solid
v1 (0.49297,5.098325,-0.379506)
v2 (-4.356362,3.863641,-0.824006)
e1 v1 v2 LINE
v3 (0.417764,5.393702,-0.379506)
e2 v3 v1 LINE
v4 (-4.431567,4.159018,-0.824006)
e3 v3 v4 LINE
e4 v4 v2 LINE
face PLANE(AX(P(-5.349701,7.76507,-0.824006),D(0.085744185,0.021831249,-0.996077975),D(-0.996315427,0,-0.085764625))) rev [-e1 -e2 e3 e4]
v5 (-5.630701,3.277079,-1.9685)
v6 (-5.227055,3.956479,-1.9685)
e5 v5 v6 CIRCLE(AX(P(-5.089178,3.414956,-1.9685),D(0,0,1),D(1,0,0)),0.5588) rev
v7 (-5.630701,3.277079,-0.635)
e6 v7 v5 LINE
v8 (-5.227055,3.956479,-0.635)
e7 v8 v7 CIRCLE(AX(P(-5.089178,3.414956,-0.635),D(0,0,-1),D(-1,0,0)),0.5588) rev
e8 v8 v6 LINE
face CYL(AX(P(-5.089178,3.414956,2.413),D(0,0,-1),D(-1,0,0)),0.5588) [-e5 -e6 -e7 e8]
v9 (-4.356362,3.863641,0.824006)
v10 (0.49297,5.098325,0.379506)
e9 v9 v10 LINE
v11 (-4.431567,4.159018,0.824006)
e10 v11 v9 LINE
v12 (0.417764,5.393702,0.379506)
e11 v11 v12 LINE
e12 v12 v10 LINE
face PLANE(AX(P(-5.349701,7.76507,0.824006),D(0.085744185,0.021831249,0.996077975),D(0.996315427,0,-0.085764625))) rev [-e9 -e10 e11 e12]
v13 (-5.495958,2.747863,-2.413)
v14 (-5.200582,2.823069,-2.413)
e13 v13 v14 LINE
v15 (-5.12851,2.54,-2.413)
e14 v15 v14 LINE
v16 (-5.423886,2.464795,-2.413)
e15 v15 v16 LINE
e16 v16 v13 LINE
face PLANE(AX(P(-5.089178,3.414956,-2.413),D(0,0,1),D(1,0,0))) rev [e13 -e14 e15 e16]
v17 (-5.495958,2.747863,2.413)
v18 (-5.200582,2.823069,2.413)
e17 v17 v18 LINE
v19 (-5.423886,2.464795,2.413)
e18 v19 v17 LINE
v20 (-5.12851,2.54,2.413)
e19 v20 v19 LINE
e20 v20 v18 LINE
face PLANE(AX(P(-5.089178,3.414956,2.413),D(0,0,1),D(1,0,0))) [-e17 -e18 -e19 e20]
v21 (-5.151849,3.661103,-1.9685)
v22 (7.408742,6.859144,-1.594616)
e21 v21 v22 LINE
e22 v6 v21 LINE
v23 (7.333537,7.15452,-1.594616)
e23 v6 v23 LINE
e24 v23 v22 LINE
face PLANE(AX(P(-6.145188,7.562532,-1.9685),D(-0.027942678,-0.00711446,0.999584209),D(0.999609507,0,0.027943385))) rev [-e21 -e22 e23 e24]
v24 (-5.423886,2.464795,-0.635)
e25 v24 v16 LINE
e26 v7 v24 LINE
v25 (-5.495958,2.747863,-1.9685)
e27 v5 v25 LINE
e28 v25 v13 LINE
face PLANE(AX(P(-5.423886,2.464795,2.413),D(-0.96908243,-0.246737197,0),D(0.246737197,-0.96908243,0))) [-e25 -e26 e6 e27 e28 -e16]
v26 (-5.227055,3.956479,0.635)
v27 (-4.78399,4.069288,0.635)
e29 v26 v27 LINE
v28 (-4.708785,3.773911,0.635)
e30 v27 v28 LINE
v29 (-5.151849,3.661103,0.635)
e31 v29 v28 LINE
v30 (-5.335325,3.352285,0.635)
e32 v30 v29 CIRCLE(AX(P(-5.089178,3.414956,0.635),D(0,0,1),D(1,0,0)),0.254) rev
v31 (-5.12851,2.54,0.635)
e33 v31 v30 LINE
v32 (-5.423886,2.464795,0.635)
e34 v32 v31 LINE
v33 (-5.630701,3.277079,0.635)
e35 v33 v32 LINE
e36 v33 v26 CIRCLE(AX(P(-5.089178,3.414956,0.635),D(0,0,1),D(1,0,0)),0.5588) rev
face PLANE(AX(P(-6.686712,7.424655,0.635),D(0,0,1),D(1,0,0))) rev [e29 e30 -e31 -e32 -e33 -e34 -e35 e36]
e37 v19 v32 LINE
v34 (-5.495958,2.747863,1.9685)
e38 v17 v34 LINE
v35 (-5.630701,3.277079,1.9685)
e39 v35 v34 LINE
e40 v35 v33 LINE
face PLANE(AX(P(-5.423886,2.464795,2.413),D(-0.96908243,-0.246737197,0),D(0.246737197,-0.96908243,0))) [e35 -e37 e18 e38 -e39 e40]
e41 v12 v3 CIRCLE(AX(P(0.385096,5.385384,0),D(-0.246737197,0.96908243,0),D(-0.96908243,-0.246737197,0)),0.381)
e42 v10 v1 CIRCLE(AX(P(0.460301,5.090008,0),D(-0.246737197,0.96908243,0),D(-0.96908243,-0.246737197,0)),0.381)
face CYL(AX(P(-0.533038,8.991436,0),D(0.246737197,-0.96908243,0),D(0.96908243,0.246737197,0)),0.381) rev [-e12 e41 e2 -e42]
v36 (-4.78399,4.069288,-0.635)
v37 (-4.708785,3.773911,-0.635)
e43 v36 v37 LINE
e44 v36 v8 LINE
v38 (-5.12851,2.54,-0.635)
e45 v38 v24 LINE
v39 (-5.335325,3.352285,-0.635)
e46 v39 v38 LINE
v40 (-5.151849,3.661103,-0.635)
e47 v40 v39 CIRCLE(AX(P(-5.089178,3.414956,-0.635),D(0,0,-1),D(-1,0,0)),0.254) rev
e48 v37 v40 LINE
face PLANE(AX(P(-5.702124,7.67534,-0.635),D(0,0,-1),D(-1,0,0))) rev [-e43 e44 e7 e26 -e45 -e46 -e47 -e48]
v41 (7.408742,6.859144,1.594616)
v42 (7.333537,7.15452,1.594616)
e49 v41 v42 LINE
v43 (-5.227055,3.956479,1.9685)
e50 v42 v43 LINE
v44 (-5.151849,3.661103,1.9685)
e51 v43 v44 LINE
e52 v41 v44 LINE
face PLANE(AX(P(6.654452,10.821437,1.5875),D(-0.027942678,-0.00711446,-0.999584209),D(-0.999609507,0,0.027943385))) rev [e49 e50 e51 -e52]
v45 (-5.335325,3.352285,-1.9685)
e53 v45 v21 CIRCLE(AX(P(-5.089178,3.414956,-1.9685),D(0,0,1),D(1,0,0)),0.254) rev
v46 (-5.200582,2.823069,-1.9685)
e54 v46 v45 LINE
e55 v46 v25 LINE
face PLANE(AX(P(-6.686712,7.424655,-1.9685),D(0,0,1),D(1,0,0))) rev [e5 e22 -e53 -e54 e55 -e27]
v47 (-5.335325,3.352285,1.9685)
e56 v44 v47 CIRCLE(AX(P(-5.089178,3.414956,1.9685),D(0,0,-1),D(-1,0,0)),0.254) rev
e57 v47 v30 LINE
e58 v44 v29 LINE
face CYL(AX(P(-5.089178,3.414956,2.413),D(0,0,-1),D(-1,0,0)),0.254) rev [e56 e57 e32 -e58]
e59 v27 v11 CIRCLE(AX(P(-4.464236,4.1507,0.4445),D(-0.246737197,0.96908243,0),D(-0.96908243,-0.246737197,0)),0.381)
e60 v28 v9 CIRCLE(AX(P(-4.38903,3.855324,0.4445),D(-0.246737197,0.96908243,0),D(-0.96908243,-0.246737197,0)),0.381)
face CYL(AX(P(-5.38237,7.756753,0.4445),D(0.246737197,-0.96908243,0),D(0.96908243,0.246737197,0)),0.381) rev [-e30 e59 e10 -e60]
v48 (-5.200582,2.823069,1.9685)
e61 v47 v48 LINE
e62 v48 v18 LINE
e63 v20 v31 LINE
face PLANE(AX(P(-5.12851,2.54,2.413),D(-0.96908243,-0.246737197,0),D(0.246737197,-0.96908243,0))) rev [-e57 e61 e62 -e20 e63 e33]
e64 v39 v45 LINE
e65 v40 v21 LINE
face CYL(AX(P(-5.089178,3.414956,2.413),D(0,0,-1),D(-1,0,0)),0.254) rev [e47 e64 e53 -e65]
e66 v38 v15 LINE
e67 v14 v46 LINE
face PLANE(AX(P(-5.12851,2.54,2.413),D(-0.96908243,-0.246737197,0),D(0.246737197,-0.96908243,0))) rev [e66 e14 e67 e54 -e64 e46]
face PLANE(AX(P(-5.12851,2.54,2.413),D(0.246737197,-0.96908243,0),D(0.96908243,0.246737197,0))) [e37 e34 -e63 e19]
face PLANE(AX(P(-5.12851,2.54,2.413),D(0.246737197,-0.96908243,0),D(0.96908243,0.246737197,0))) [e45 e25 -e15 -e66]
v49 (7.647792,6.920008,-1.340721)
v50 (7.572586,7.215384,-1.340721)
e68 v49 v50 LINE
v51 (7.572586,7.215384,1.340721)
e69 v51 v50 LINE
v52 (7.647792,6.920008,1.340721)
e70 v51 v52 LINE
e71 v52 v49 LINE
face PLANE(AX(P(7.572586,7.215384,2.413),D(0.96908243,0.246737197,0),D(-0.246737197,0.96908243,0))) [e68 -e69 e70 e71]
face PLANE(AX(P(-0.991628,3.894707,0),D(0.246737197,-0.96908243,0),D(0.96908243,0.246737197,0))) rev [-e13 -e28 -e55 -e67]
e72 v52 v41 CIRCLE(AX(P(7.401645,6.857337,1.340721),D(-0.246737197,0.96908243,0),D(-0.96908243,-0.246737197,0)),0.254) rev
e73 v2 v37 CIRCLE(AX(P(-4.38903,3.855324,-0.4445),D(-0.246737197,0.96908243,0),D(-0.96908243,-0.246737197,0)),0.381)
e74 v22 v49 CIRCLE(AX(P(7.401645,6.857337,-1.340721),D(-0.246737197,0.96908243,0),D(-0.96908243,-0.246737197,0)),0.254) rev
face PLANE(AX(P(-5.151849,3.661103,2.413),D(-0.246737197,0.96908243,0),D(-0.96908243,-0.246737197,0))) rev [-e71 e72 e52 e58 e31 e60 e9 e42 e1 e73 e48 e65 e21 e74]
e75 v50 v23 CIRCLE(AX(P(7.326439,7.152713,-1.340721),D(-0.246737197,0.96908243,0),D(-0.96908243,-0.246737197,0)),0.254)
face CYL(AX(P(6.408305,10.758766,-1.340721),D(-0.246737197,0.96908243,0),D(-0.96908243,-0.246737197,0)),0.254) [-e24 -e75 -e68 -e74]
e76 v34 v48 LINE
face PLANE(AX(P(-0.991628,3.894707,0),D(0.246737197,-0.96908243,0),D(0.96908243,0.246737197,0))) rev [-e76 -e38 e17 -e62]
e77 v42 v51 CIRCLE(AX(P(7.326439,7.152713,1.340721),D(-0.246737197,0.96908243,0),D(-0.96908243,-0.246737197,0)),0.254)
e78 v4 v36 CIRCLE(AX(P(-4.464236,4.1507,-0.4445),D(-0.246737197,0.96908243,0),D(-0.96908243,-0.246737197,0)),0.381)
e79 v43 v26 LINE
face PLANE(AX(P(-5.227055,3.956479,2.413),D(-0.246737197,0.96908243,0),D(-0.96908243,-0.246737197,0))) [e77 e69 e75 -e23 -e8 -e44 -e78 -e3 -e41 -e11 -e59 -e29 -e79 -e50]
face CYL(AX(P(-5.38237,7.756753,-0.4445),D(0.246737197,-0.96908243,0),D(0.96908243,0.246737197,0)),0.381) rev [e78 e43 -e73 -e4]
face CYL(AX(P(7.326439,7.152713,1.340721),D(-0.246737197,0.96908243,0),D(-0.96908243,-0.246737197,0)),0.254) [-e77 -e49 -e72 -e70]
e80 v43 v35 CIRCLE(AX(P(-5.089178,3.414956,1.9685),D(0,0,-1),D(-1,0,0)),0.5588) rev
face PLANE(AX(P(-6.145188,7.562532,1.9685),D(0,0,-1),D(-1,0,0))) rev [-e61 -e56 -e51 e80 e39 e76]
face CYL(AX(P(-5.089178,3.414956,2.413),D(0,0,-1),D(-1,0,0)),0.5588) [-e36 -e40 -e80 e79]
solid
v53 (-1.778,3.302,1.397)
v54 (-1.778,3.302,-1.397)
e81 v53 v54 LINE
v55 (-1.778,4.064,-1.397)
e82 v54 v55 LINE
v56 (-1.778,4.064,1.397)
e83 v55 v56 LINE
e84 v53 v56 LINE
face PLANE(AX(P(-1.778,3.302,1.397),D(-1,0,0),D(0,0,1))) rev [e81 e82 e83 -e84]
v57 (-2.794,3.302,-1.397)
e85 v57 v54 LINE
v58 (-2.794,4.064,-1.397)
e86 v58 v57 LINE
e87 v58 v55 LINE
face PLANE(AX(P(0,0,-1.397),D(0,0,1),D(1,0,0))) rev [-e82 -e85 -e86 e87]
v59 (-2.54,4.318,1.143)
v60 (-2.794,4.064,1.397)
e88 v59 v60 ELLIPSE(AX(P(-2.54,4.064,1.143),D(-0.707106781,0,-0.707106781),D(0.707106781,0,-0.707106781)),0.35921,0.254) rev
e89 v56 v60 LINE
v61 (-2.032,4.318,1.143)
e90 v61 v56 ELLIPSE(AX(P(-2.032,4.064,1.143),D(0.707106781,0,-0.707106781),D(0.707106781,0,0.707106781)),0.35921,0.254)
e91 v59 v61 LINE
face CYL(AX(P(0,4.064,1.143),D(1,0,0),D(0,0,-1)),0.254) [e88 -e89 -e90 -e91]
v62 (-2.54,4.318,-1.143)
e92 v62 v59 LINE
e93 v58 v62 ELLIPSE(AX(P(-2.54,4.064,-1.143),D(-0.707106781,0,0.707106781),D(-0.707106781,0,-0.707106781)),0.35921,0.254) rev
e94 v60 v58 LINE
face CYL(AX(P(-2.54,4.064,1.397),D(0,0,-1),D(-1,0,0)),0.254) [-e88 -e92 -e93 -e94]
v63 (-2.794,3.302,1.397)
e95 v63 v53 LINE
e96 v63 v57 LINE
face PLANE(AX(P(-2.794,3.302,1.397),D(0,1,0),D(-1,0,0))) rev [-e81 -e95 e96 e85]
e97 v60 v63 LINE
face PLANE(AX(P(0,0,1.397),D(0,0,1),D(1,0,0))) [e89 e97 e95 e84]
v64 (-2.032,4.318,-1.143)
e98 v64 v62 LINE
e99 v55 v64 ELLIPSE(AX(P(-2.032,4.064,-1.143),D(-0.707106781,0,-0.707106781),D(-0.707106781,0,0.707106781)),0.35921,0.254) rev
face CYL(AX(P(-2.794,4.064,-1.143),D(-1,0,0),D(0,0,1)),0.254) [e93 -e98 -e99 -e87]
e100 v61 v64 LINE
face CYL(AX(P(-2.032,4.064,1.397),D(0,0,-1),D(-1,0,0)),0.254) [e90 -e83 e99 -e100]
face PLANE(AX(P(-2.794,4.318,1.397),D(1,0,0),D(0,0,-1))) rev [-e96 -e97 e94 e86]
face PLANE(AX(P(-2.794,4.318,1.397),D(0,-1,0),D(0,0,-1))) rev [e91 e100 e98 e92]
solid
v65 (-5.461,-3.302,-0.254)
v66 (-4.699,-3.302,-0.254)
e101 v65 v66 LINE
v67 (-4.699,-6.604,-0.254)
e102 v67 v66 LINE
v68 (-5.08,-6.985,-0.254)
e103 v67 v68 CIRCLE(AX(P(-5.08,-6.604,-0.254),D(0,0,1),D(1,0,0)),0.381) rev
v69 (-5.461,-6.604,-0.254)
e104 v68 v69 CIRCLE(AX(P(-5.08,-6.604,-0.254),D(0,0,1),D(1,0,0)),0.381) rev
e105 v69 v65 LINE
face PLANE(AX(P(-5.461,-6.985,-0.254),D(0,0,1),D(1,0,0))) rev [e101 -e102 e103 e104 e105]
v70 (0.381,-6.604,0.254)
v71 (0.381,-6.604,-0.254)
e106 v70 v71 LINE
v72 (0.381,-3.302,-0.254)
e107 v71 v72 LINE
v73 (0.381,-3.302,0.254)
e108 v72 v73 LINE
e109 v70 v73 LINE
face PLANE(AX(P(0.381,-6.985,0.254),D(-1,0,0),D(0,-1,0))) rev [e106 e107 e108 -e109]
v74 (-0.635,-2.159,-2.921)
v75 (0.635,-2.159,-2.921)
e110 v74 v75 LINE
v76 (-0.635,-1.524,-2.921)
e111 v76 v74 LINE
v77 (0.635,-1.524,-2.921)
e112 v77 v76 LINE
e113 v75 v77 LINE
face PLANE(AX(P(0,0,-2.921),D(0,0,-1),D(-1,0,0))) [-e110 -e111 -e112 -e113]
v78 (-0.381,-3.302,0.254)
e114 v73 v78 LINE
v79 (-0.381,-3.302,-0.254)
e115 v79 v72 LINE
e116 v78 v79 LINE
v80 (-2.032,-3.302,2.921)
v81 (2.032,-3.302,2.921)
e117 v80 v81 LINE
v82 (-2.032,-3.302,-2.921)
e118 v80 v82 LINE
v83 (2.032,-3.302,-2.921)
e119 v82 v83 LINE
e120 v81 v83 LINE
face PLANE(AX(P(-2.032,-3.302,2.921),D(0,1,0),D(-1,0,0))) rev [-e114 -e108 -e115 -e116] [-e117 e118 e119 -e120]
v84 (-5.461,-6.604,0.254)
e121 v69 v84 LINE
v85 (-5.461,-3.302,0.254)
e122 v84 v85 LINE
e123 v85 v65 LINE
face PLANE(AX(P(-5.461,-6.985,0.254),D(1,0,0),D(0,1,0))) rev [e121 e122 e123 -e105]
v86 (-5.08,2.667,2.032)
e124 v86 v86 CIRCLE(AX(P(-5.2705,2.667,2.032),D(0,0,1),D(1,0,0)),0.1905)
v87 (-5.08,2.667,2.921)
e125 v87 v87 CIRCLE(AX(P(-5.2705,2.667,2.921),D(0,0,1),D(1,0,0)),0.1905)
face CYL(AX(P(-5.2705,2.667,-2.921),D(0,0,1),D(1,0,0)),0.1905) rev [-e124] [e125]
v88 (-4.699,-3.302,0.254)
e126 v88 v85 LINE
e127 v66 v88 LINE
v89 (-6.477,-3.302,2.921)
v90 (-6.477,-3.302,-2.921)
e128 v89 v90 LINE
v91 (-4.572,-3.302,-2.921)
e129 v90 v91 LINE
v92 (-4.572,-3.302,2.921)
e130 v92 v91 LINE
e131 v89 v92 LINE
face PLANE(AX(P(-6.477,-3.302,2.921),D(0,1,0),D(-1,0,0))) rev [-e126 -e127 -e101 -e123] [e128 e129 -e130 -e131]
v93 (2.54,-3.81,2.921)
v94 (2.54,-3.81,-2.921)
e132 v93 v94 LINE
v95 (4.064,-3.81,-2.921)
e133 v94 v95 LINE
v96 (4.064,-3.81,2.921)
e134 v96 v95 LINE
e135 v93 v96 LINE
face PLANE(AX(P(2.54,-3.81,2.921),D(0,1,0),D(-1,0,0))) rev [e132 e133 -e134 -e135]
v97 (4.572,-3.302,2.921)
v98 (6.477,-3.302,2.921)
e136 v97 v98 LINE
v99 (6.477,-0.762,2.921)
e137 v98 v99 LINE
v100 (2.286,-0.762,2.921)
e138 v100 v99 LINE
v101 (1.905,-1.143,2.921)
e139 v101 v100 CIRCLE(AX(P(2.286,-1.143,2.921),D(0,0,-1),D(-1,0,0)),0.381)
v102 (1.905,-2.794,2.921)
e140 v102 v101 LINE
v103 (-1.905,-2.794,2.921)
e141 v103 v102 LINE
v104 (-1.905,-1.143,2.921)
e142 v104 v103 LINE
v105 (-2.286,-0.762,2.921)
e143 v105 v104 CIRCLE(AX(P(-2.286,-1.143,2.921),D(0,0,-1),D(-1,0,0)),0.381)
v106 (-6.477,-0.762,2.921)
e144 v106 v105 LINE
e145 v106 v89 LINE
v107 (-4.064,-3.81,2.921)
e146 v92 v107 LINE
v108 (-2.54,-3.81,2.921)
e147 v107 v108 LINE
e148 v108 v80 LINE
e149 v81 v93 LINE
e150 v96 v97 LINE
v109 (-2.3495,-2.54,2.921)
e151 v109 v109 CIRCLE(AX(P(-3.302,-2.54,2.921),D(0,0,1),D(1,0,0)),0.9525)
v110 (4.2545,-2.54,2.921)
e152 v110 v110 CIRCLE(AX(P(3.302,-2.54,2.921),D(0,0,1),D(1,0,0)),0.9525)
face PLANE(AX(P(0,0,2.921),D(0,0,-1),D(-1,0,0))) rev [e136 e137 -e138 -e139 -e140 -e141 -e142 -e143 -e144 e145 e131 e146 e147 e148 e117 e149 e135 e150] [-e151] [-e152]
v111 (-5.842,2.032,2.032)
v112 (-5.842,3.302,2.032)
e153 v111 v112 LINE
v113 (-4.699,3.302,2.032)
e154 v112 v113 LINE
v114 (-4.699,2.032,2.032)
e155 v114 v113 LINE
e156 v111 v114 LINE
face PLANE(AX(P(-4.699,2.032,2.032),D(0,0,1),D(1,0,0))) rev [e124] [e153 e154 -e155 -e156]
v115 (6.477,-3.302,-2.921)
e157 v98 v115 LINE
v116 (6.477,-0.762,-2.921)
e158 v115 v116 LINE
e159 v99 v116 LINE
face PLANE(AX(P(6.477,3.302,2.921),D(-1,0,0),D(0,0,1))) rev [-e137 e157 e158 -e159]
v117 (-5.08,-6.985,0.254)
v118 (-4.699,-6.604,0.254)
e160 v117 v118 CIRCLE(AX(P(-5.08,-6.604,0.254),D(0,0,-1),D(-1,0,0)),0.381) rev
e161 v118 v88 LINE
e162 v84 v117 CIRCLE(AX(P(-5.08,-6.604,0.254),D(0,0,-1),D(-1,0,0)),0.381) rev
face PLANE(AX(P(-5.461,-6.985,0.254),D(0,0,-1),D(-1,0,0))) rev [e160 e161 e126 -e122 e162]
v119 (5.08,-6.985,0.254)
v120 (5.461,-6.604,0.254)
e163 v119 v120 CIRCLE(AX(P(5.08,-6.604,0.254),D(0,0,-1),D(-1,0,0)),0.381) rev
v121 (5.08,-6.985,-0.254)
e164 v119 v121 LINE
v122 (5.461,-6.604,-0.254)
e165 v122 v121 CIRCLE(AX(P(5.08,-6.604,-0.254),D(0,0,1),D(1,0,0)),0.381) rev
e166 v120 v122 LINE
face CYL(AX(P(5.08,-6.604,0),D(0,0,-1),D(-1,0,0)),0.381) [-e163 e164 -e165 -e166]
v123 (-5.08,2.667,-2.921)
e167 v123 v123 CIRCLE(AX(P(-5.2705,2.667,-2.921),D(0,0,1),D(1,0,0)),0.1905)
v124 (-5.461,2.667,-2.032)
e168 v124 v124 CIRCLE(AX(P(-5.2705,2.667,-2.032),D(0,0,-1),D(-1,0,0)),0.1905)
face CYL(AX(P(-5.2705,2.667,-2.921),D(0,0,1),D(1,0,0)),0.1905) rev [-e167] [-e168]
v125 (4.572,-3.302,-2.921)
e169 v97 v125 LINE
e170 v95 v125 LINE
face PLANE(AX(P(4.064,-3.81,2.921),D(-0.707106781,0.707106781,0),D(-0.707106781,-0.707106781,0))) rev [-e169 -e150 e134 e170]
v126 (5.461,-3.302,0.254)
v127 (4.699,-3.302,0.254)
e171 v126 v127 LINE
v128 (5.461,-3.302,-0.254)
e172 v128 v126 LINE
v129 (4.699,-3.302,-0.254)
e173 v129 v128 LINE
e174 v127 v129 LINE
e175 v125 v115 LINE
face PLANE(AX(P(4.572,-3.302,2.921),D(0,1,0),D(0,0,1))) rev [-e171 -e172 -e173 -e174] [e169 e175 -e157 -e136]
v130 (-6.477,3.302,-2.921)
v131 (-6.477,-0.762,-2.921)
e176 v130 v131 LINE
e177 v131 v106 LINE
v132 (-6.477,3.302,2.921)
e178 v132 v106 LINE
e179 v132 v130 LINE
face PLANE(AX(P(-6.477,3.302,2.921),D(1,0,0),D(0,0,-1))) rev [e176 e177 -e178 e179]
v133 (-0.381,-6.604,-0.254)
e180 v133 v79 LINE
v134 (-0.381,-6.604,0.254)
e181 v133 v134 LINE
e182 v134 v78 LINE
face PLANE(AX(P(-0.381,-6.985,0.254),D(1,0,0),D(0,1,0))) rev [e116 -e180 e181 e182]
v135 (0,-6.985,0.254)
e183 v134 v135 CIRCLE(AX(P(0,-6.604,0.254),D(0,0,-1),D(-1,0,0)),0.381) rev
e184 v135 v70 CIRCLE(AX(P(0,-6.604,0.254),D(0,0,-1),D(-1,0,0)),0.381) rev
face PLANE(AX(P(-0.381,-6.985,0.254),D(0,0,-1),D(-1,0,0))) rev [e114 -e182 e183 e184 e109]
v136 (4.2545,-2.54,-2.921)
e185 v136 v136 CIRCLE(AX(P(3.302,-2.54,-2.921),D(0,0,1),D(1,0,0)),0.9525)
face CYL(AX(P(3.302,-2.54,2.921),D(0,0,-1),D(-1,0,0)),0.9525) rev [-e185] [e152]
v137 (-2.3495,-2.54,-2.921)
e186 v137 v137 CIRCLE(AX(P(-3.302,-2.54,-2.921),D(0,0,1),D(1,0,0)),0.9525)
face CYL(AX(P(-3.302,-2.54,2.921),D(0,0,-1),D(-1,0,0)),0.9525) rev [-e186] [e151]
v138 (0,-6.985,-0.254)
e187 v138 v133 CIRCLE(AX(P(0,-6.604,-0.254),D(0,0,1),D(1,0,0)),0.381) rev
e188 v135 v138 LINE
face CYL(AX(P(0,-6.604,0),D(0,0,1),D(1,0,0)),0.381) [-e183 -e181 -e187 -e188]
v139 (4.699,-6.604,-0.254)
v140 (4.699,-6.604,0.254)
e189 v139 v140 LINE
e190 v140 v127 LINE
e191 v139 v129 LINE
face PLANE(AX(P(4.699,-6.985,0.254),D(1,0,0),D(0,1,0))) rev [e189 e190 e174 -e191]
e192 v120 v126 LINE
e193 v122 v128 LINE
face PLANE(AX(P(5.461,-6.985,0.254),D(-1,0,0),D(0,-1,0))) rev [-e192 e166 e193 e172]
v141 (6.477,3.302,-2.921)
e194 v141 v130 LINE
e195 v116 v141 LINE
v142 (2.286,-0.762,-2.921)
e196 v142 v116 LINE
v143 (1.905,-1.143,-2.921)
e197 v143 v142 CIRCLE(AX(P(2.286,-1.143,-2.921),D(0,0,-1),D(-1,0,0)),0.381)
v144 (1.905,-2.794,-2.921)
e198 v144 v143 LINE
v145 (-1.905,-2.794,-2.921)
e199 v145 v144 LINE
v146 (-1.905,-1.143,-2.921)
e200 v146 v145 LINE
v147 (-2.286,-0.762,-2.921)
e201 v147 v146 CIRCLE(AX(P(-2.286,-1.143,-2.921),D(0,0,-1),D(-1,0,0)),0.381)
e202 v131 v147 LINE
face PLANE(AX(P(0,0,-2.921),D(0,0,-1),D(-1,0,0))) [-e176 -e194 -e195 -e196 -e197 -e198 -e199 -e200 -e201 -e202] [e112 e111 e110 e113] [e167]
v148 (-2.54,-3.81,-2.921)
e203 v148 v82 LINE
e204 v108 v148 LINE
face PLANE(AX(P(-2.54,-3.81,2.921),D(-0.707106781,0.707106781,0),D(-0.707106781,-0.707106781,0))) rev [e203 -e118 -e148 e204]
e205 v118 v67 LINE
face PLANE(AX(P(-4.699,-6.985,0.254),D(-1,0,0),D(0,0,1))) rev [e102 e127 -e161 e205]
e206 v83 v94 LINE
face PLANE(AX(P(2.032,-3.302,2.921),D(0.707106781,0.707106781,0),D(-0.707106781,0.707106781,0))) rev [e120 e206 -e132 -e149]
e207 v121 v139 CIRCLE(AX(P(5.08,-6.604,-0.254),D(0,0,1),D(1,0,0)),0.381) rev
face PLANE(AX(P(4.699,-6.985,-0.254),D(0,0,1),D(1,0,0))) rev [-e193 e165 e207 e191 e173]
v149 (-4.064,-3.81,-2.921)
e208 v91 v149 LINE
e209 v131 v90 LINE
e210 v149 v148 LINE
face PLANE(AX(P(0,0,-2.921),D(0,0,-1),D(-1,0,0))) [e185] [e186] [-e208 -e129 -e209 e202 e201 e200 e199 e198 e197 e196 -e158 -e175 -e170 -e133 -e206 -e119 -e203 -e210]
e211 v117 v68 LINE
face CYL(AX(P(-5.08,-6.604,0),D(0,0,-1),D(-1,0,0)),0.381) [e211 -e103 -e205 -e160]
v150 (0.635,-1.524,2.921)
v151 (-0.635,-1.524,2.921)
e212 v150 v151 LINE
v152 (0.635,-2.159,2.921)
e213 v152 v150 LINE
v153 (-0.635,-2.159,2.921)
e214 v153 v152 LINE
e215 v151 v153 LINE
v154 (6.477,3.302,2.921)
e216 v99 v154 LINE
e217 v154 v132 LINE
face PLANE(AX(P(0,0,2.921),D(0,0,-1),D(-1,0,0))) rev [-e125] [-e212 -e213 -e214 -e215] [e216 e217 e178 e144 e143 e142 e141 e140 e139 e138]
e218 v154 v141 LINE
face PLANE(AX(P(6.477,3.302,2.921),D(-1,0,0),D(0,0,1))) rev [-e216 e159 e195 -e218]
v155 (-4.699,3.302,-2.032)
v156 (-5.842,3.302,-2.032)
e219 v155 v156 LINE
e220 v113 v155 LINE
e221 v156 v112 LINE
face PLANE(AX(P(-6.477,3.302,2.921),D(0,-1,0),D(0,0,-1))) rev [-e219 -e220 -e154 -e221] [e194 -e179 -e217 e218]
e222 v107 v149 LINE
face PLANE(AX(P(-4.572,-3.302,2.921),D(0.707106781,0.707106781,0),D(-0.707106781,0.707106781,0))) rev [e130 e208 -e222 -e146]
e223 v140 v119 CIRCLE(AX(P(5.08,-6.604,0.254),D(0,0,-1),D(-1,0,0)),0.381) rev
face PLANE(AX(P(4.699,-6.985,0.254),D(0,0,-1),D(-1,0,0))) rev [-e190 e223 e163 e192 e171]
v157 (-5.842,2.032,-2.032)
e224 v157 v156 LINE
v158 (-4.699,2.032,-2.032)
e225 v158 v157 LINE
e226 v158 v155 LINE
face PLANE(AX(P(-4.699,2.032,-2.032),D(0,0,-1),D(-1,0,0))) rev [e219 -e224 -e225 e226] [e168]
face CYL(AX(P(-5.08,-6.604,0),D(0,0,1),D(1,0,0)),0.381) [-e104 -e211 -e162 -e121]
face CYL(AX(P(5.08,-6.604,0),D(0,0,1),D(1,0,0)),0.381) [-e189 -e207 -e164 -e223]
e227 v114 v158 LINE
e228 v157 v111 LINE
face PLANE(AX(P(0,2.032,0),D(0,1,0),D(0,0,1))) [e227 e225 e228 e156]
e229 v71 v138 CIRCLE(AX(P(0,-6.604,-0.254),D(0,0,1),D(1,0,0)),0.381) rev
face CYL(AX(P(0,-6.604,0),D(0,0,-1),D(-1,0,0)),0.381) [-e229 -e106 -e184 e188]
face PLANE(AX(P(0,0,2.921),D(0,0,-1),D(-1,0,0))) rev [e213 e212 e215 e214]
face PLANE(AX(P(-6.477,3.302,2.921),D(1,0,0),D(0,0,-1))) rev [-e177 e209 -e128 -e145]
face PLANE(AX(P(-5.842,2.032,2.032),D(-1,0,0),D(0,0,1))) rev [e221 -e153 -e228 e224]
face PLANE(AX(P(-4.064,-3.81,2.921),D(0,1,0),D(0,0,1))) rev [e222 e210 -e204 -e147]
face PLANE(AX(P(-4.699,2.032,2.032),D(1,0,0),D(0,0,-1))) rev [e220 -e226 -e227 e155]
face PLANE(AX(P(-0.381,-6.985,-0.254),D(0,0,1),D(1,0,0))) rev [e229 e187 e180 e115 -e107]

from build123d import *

# Parameters (mm, degrees)
SKETCH1_R               = 0.9525
BOSS_EXTRUDE1_DEPTH     = 2.921
SKETCH4_W               = 0.762
SKETCH4_H               = 0.508
BOSS_EXTRUDE2_DEPTH     = 3.683
FILLET1_R               = 0.381
SKETCH5_W               = 1.143
SKETCH5_H               = 4.064
CUT_EXTRUDE1_DEPTH      = 1.27
CUT_EXTRUDE2_DEPTH      = 10.963633624
CUT_EXTRUDE2_DEPTH_BACK = 10.963633624
SKETCH7_R               = 0.1905
SKETCH8_W               = 1.016
SKETCH8_H               = 1.016
BOSS_EXTRUDE3_DEPTH     = 1.397
FILLET2_R               = 0.254
EXTRUDE_THIN1_DEPTH     = 2.413
CUT_EXTRUDE3_DEPTH      = 4.826
SKETCH12_W              = 0.3048
SKETCH12_H              = 1.27
CUT_EXTRUDE4_DEPTH      = 0.2921
FILLET3_R               = 0.254


with BuildPart() as part:
    # Sketch1 → Boss-Extrude1 (new, symmetric)
    with BuildSketch(Plane.XY):
        Polygon((-4.572, -3.302), (-4.064, -3.81), (-2.54, -3.81), (-2.032, -3.302), (2.032, -3.302), (2.54, -3.81), (4.064, -3.81), (4.572, -3.302), (6.477, -3.302), (6.477, 3.302), (-6.477, 3.302), (-6.477, -3.302), align=None)
        with Locations((3.302, -2.54)):
            Circle(SKETCH1_R, mode=Mode.SUBTRACT)
        with Locations((-3.302, -2.54)):
            Circle(SKETCH1_R, mode=Mode.SUBTRACT)
    extrude(amount=BOSS_EXTRUDE1_DEPTH, both=True)

    # Sketch4 → Boss-Extrude2 (add)
    with BuildSketch(Plane.XZ.offset(3.302)):
        with Locations((-5.08, 0)):
            Rectangle(SKETCH4_W, SKETCH4_H)
        Rectangle(SKETCH4_W, SKETCH4_H)
        with Locations((5.08, 0)):
            Rectangle(SKETCH4_W, SKETCH4_H)
    extrude(amount=BOSS_EXTRUDE2_DEPTH)

    # Fillet1
    fillet1_edges = [part.edges().sort_by_distance(p)[0] for p in [
        (-5.461, -6.985, 0),
        (-4.699, -6.985, 0),
        (-0.381, -6.985, 0),
        (0.381, -6.985, 0),
        (4.699, -6.985, 0),
        (5.461, -6.985, 0),
    ]]
    fillet(fillet1_edges, radius=FILLET1_R - 0.0001)  # a hair under: the kernel refuses the full size

    # Sketch5 → Cut-Extrude1 (cut)
    with BuildSketch(Plane(origin=(0, 3.302, 0), x_dir=(1, 0, 0), z_dir=(0, 1, 0))):
        with Locations((-5.2705, 0)):
            Rectangle(SKETCH5_W, SKETCH5_H)
    extrude(amount=-CUT_EXTRUDE1_DEPTH, mode=Mode.SUBTRACT)

    # Sketch7 → Cut-Extrude2 (cut, two sides: drawn at the far end of the back side and taken through both)
    with BuildSketch(Plane.XY.offset(-CUT_EXTRUDE2_DEPTH_BACK)):
        with Locations((-5.2705, 2.667)):
            Circle(SKETCH7_R)
    extrude(amount=CUT_EXTRUDE2_DEPTH + CUT_EXTRUDE2_DEPTH_BACK, mode=Mode.SUBTRACT)


with BuildPart() as body_2:
    # Sketch8 → Boss-Extrude3 (new, symmetric)
    with BuildSketch(Plane.XY):
        with Locations((-2.286, 3.81)):
            Rectangle(SKETCH8_W, SKETCH8_H)
    extrude(amount=BOSS_EXTRUDE3_DEPTH, both=True)

    # Fillet2
    fillet2_edges = [body_2.edges().sort_by_distance(p)[0] for p in [
        (-2.286, 4.318, 1.397),
        (-2.286, 4.318, -1.397),
        (-1.778, 4.318, 0),
        (-2.794, 4.318, 0),
    ]]
    fillet(fillet2_edges, radius=FILLET2_R)


with BuildPart() as body_3:
    # Sketch9 → Extrude-Thin1 (new, symmetric)
    with BuildSketch(Plane.XY):
        with BuildLine():
            Line((-5.128509683, 2.54), (-5.335324802, 3.352284893))
            ThreePointArc((-5.335324802, 3.352284893), (-5.307545297, 3.544693045), (-5.151849113, 3.661103078))
            Line((-5.151849113, 3.661103078), (7.64779162, 6.920007972))
            Line((7.64779162, 6.920007972), (7.572586123, 7.215384297))
            Line((7.572586123, 7.215384297), (-5.22705461, 3.956479402))
            ThreePointArc((-5.22705461, 3.956479402), (-5.569586217, 3.700377329), (-5.630701126, 3.277079395))
            Line((-5.630701126, 3.277079395), (-5.423886008, 2.464794502))
            Line((-5.423886008, 2.464794502), (-5.128509683, 2.54))
        make_face()
    extrude(amount=EXTRUDE_THIN1_DEPTH, both=True)

    # Sketch10 → Cut-Extrude3 (cut)
    with BuildSketch(Plane(origin=(-0.991627781, 3.894706889, 0), x_dir=(-0.9690824297997345, -0.24673719673661426, 0), z_dir=(0.24673719673661426, -0.9690824297997345, 0))):
        Polygon((4.648036146, 1.9685), (4.089236146, 1.9685), (-9.118763854, 1.5875), (-9.118763854, 2.413), (4.648036146, 2.413), align=None)
        Polygon((-9.118763854, -1.5875), (4.089236146, -1.9685), (4.648036146, -1.9685), (4.648036146, -2.413), (-9.118763854, -2.413), align=None)
        with BuildLine():
            Line((4.648036146, -0.635), (3.632036146, -0.635))
            ThreePointArc((3.632036146, -0.635), (3.477782055, -0.78256797), (3.268369677, -0.824005708))
            Line((3.268369677, -0.824005708), (-1.735674644, -0.379505708))
            ThreePointArc((-1.735674644, -0.379505708), (-2.082963854, 0), (-1.735674644, 0.379505708))
            Line((-1.735674644, 0.379505708), (3.268369677, 0.824005708))
            ThreePointArc((3.268369677, 0.824005708), (3.477782055, 0.78256797), (3.632036146, 0.635))
            Line((3.632036146, 0.635), (4.648036146, 0.635))
            Line((4.648036146, 0.635), (4.648036146, -0.635))
        make_face()
    extrude(amount=-CUT_EXTRUDE3_DEPTH, mode=Mode.SUBTRACT)

    # Sketch12 → Cut-Extrude4 (cut)
    with BuildSketch(Plane(origin=(-0.991627781, 3.894706889, 0), x_dir=(0.9690824297997345, 0.24673719673661426, 0), z_dir=(-0.24673719673661426, 0.9690824297997345, 0))):
        with Locations((-4.495636146, 0)):
            Rectangle(SKETCH12_W, SKETCH12_H)
    extrude(amount=-CUT_EXTRUDE4_DEPTH, mode=Mode.SUBTRACT)

    # Fillet3
    fillet3_edges = [body_3.edges().sort_by_distance(p)[0] for p in [
        (7.610188871, 7.067696135, -1.5875),
        (7.610188871, 7.067696135, 1.5875),
    ]]
    fillet(fillet3_edges, radius=FILLET3_R)


solid = Compound([part.part, body_2.part, body_3.part])
